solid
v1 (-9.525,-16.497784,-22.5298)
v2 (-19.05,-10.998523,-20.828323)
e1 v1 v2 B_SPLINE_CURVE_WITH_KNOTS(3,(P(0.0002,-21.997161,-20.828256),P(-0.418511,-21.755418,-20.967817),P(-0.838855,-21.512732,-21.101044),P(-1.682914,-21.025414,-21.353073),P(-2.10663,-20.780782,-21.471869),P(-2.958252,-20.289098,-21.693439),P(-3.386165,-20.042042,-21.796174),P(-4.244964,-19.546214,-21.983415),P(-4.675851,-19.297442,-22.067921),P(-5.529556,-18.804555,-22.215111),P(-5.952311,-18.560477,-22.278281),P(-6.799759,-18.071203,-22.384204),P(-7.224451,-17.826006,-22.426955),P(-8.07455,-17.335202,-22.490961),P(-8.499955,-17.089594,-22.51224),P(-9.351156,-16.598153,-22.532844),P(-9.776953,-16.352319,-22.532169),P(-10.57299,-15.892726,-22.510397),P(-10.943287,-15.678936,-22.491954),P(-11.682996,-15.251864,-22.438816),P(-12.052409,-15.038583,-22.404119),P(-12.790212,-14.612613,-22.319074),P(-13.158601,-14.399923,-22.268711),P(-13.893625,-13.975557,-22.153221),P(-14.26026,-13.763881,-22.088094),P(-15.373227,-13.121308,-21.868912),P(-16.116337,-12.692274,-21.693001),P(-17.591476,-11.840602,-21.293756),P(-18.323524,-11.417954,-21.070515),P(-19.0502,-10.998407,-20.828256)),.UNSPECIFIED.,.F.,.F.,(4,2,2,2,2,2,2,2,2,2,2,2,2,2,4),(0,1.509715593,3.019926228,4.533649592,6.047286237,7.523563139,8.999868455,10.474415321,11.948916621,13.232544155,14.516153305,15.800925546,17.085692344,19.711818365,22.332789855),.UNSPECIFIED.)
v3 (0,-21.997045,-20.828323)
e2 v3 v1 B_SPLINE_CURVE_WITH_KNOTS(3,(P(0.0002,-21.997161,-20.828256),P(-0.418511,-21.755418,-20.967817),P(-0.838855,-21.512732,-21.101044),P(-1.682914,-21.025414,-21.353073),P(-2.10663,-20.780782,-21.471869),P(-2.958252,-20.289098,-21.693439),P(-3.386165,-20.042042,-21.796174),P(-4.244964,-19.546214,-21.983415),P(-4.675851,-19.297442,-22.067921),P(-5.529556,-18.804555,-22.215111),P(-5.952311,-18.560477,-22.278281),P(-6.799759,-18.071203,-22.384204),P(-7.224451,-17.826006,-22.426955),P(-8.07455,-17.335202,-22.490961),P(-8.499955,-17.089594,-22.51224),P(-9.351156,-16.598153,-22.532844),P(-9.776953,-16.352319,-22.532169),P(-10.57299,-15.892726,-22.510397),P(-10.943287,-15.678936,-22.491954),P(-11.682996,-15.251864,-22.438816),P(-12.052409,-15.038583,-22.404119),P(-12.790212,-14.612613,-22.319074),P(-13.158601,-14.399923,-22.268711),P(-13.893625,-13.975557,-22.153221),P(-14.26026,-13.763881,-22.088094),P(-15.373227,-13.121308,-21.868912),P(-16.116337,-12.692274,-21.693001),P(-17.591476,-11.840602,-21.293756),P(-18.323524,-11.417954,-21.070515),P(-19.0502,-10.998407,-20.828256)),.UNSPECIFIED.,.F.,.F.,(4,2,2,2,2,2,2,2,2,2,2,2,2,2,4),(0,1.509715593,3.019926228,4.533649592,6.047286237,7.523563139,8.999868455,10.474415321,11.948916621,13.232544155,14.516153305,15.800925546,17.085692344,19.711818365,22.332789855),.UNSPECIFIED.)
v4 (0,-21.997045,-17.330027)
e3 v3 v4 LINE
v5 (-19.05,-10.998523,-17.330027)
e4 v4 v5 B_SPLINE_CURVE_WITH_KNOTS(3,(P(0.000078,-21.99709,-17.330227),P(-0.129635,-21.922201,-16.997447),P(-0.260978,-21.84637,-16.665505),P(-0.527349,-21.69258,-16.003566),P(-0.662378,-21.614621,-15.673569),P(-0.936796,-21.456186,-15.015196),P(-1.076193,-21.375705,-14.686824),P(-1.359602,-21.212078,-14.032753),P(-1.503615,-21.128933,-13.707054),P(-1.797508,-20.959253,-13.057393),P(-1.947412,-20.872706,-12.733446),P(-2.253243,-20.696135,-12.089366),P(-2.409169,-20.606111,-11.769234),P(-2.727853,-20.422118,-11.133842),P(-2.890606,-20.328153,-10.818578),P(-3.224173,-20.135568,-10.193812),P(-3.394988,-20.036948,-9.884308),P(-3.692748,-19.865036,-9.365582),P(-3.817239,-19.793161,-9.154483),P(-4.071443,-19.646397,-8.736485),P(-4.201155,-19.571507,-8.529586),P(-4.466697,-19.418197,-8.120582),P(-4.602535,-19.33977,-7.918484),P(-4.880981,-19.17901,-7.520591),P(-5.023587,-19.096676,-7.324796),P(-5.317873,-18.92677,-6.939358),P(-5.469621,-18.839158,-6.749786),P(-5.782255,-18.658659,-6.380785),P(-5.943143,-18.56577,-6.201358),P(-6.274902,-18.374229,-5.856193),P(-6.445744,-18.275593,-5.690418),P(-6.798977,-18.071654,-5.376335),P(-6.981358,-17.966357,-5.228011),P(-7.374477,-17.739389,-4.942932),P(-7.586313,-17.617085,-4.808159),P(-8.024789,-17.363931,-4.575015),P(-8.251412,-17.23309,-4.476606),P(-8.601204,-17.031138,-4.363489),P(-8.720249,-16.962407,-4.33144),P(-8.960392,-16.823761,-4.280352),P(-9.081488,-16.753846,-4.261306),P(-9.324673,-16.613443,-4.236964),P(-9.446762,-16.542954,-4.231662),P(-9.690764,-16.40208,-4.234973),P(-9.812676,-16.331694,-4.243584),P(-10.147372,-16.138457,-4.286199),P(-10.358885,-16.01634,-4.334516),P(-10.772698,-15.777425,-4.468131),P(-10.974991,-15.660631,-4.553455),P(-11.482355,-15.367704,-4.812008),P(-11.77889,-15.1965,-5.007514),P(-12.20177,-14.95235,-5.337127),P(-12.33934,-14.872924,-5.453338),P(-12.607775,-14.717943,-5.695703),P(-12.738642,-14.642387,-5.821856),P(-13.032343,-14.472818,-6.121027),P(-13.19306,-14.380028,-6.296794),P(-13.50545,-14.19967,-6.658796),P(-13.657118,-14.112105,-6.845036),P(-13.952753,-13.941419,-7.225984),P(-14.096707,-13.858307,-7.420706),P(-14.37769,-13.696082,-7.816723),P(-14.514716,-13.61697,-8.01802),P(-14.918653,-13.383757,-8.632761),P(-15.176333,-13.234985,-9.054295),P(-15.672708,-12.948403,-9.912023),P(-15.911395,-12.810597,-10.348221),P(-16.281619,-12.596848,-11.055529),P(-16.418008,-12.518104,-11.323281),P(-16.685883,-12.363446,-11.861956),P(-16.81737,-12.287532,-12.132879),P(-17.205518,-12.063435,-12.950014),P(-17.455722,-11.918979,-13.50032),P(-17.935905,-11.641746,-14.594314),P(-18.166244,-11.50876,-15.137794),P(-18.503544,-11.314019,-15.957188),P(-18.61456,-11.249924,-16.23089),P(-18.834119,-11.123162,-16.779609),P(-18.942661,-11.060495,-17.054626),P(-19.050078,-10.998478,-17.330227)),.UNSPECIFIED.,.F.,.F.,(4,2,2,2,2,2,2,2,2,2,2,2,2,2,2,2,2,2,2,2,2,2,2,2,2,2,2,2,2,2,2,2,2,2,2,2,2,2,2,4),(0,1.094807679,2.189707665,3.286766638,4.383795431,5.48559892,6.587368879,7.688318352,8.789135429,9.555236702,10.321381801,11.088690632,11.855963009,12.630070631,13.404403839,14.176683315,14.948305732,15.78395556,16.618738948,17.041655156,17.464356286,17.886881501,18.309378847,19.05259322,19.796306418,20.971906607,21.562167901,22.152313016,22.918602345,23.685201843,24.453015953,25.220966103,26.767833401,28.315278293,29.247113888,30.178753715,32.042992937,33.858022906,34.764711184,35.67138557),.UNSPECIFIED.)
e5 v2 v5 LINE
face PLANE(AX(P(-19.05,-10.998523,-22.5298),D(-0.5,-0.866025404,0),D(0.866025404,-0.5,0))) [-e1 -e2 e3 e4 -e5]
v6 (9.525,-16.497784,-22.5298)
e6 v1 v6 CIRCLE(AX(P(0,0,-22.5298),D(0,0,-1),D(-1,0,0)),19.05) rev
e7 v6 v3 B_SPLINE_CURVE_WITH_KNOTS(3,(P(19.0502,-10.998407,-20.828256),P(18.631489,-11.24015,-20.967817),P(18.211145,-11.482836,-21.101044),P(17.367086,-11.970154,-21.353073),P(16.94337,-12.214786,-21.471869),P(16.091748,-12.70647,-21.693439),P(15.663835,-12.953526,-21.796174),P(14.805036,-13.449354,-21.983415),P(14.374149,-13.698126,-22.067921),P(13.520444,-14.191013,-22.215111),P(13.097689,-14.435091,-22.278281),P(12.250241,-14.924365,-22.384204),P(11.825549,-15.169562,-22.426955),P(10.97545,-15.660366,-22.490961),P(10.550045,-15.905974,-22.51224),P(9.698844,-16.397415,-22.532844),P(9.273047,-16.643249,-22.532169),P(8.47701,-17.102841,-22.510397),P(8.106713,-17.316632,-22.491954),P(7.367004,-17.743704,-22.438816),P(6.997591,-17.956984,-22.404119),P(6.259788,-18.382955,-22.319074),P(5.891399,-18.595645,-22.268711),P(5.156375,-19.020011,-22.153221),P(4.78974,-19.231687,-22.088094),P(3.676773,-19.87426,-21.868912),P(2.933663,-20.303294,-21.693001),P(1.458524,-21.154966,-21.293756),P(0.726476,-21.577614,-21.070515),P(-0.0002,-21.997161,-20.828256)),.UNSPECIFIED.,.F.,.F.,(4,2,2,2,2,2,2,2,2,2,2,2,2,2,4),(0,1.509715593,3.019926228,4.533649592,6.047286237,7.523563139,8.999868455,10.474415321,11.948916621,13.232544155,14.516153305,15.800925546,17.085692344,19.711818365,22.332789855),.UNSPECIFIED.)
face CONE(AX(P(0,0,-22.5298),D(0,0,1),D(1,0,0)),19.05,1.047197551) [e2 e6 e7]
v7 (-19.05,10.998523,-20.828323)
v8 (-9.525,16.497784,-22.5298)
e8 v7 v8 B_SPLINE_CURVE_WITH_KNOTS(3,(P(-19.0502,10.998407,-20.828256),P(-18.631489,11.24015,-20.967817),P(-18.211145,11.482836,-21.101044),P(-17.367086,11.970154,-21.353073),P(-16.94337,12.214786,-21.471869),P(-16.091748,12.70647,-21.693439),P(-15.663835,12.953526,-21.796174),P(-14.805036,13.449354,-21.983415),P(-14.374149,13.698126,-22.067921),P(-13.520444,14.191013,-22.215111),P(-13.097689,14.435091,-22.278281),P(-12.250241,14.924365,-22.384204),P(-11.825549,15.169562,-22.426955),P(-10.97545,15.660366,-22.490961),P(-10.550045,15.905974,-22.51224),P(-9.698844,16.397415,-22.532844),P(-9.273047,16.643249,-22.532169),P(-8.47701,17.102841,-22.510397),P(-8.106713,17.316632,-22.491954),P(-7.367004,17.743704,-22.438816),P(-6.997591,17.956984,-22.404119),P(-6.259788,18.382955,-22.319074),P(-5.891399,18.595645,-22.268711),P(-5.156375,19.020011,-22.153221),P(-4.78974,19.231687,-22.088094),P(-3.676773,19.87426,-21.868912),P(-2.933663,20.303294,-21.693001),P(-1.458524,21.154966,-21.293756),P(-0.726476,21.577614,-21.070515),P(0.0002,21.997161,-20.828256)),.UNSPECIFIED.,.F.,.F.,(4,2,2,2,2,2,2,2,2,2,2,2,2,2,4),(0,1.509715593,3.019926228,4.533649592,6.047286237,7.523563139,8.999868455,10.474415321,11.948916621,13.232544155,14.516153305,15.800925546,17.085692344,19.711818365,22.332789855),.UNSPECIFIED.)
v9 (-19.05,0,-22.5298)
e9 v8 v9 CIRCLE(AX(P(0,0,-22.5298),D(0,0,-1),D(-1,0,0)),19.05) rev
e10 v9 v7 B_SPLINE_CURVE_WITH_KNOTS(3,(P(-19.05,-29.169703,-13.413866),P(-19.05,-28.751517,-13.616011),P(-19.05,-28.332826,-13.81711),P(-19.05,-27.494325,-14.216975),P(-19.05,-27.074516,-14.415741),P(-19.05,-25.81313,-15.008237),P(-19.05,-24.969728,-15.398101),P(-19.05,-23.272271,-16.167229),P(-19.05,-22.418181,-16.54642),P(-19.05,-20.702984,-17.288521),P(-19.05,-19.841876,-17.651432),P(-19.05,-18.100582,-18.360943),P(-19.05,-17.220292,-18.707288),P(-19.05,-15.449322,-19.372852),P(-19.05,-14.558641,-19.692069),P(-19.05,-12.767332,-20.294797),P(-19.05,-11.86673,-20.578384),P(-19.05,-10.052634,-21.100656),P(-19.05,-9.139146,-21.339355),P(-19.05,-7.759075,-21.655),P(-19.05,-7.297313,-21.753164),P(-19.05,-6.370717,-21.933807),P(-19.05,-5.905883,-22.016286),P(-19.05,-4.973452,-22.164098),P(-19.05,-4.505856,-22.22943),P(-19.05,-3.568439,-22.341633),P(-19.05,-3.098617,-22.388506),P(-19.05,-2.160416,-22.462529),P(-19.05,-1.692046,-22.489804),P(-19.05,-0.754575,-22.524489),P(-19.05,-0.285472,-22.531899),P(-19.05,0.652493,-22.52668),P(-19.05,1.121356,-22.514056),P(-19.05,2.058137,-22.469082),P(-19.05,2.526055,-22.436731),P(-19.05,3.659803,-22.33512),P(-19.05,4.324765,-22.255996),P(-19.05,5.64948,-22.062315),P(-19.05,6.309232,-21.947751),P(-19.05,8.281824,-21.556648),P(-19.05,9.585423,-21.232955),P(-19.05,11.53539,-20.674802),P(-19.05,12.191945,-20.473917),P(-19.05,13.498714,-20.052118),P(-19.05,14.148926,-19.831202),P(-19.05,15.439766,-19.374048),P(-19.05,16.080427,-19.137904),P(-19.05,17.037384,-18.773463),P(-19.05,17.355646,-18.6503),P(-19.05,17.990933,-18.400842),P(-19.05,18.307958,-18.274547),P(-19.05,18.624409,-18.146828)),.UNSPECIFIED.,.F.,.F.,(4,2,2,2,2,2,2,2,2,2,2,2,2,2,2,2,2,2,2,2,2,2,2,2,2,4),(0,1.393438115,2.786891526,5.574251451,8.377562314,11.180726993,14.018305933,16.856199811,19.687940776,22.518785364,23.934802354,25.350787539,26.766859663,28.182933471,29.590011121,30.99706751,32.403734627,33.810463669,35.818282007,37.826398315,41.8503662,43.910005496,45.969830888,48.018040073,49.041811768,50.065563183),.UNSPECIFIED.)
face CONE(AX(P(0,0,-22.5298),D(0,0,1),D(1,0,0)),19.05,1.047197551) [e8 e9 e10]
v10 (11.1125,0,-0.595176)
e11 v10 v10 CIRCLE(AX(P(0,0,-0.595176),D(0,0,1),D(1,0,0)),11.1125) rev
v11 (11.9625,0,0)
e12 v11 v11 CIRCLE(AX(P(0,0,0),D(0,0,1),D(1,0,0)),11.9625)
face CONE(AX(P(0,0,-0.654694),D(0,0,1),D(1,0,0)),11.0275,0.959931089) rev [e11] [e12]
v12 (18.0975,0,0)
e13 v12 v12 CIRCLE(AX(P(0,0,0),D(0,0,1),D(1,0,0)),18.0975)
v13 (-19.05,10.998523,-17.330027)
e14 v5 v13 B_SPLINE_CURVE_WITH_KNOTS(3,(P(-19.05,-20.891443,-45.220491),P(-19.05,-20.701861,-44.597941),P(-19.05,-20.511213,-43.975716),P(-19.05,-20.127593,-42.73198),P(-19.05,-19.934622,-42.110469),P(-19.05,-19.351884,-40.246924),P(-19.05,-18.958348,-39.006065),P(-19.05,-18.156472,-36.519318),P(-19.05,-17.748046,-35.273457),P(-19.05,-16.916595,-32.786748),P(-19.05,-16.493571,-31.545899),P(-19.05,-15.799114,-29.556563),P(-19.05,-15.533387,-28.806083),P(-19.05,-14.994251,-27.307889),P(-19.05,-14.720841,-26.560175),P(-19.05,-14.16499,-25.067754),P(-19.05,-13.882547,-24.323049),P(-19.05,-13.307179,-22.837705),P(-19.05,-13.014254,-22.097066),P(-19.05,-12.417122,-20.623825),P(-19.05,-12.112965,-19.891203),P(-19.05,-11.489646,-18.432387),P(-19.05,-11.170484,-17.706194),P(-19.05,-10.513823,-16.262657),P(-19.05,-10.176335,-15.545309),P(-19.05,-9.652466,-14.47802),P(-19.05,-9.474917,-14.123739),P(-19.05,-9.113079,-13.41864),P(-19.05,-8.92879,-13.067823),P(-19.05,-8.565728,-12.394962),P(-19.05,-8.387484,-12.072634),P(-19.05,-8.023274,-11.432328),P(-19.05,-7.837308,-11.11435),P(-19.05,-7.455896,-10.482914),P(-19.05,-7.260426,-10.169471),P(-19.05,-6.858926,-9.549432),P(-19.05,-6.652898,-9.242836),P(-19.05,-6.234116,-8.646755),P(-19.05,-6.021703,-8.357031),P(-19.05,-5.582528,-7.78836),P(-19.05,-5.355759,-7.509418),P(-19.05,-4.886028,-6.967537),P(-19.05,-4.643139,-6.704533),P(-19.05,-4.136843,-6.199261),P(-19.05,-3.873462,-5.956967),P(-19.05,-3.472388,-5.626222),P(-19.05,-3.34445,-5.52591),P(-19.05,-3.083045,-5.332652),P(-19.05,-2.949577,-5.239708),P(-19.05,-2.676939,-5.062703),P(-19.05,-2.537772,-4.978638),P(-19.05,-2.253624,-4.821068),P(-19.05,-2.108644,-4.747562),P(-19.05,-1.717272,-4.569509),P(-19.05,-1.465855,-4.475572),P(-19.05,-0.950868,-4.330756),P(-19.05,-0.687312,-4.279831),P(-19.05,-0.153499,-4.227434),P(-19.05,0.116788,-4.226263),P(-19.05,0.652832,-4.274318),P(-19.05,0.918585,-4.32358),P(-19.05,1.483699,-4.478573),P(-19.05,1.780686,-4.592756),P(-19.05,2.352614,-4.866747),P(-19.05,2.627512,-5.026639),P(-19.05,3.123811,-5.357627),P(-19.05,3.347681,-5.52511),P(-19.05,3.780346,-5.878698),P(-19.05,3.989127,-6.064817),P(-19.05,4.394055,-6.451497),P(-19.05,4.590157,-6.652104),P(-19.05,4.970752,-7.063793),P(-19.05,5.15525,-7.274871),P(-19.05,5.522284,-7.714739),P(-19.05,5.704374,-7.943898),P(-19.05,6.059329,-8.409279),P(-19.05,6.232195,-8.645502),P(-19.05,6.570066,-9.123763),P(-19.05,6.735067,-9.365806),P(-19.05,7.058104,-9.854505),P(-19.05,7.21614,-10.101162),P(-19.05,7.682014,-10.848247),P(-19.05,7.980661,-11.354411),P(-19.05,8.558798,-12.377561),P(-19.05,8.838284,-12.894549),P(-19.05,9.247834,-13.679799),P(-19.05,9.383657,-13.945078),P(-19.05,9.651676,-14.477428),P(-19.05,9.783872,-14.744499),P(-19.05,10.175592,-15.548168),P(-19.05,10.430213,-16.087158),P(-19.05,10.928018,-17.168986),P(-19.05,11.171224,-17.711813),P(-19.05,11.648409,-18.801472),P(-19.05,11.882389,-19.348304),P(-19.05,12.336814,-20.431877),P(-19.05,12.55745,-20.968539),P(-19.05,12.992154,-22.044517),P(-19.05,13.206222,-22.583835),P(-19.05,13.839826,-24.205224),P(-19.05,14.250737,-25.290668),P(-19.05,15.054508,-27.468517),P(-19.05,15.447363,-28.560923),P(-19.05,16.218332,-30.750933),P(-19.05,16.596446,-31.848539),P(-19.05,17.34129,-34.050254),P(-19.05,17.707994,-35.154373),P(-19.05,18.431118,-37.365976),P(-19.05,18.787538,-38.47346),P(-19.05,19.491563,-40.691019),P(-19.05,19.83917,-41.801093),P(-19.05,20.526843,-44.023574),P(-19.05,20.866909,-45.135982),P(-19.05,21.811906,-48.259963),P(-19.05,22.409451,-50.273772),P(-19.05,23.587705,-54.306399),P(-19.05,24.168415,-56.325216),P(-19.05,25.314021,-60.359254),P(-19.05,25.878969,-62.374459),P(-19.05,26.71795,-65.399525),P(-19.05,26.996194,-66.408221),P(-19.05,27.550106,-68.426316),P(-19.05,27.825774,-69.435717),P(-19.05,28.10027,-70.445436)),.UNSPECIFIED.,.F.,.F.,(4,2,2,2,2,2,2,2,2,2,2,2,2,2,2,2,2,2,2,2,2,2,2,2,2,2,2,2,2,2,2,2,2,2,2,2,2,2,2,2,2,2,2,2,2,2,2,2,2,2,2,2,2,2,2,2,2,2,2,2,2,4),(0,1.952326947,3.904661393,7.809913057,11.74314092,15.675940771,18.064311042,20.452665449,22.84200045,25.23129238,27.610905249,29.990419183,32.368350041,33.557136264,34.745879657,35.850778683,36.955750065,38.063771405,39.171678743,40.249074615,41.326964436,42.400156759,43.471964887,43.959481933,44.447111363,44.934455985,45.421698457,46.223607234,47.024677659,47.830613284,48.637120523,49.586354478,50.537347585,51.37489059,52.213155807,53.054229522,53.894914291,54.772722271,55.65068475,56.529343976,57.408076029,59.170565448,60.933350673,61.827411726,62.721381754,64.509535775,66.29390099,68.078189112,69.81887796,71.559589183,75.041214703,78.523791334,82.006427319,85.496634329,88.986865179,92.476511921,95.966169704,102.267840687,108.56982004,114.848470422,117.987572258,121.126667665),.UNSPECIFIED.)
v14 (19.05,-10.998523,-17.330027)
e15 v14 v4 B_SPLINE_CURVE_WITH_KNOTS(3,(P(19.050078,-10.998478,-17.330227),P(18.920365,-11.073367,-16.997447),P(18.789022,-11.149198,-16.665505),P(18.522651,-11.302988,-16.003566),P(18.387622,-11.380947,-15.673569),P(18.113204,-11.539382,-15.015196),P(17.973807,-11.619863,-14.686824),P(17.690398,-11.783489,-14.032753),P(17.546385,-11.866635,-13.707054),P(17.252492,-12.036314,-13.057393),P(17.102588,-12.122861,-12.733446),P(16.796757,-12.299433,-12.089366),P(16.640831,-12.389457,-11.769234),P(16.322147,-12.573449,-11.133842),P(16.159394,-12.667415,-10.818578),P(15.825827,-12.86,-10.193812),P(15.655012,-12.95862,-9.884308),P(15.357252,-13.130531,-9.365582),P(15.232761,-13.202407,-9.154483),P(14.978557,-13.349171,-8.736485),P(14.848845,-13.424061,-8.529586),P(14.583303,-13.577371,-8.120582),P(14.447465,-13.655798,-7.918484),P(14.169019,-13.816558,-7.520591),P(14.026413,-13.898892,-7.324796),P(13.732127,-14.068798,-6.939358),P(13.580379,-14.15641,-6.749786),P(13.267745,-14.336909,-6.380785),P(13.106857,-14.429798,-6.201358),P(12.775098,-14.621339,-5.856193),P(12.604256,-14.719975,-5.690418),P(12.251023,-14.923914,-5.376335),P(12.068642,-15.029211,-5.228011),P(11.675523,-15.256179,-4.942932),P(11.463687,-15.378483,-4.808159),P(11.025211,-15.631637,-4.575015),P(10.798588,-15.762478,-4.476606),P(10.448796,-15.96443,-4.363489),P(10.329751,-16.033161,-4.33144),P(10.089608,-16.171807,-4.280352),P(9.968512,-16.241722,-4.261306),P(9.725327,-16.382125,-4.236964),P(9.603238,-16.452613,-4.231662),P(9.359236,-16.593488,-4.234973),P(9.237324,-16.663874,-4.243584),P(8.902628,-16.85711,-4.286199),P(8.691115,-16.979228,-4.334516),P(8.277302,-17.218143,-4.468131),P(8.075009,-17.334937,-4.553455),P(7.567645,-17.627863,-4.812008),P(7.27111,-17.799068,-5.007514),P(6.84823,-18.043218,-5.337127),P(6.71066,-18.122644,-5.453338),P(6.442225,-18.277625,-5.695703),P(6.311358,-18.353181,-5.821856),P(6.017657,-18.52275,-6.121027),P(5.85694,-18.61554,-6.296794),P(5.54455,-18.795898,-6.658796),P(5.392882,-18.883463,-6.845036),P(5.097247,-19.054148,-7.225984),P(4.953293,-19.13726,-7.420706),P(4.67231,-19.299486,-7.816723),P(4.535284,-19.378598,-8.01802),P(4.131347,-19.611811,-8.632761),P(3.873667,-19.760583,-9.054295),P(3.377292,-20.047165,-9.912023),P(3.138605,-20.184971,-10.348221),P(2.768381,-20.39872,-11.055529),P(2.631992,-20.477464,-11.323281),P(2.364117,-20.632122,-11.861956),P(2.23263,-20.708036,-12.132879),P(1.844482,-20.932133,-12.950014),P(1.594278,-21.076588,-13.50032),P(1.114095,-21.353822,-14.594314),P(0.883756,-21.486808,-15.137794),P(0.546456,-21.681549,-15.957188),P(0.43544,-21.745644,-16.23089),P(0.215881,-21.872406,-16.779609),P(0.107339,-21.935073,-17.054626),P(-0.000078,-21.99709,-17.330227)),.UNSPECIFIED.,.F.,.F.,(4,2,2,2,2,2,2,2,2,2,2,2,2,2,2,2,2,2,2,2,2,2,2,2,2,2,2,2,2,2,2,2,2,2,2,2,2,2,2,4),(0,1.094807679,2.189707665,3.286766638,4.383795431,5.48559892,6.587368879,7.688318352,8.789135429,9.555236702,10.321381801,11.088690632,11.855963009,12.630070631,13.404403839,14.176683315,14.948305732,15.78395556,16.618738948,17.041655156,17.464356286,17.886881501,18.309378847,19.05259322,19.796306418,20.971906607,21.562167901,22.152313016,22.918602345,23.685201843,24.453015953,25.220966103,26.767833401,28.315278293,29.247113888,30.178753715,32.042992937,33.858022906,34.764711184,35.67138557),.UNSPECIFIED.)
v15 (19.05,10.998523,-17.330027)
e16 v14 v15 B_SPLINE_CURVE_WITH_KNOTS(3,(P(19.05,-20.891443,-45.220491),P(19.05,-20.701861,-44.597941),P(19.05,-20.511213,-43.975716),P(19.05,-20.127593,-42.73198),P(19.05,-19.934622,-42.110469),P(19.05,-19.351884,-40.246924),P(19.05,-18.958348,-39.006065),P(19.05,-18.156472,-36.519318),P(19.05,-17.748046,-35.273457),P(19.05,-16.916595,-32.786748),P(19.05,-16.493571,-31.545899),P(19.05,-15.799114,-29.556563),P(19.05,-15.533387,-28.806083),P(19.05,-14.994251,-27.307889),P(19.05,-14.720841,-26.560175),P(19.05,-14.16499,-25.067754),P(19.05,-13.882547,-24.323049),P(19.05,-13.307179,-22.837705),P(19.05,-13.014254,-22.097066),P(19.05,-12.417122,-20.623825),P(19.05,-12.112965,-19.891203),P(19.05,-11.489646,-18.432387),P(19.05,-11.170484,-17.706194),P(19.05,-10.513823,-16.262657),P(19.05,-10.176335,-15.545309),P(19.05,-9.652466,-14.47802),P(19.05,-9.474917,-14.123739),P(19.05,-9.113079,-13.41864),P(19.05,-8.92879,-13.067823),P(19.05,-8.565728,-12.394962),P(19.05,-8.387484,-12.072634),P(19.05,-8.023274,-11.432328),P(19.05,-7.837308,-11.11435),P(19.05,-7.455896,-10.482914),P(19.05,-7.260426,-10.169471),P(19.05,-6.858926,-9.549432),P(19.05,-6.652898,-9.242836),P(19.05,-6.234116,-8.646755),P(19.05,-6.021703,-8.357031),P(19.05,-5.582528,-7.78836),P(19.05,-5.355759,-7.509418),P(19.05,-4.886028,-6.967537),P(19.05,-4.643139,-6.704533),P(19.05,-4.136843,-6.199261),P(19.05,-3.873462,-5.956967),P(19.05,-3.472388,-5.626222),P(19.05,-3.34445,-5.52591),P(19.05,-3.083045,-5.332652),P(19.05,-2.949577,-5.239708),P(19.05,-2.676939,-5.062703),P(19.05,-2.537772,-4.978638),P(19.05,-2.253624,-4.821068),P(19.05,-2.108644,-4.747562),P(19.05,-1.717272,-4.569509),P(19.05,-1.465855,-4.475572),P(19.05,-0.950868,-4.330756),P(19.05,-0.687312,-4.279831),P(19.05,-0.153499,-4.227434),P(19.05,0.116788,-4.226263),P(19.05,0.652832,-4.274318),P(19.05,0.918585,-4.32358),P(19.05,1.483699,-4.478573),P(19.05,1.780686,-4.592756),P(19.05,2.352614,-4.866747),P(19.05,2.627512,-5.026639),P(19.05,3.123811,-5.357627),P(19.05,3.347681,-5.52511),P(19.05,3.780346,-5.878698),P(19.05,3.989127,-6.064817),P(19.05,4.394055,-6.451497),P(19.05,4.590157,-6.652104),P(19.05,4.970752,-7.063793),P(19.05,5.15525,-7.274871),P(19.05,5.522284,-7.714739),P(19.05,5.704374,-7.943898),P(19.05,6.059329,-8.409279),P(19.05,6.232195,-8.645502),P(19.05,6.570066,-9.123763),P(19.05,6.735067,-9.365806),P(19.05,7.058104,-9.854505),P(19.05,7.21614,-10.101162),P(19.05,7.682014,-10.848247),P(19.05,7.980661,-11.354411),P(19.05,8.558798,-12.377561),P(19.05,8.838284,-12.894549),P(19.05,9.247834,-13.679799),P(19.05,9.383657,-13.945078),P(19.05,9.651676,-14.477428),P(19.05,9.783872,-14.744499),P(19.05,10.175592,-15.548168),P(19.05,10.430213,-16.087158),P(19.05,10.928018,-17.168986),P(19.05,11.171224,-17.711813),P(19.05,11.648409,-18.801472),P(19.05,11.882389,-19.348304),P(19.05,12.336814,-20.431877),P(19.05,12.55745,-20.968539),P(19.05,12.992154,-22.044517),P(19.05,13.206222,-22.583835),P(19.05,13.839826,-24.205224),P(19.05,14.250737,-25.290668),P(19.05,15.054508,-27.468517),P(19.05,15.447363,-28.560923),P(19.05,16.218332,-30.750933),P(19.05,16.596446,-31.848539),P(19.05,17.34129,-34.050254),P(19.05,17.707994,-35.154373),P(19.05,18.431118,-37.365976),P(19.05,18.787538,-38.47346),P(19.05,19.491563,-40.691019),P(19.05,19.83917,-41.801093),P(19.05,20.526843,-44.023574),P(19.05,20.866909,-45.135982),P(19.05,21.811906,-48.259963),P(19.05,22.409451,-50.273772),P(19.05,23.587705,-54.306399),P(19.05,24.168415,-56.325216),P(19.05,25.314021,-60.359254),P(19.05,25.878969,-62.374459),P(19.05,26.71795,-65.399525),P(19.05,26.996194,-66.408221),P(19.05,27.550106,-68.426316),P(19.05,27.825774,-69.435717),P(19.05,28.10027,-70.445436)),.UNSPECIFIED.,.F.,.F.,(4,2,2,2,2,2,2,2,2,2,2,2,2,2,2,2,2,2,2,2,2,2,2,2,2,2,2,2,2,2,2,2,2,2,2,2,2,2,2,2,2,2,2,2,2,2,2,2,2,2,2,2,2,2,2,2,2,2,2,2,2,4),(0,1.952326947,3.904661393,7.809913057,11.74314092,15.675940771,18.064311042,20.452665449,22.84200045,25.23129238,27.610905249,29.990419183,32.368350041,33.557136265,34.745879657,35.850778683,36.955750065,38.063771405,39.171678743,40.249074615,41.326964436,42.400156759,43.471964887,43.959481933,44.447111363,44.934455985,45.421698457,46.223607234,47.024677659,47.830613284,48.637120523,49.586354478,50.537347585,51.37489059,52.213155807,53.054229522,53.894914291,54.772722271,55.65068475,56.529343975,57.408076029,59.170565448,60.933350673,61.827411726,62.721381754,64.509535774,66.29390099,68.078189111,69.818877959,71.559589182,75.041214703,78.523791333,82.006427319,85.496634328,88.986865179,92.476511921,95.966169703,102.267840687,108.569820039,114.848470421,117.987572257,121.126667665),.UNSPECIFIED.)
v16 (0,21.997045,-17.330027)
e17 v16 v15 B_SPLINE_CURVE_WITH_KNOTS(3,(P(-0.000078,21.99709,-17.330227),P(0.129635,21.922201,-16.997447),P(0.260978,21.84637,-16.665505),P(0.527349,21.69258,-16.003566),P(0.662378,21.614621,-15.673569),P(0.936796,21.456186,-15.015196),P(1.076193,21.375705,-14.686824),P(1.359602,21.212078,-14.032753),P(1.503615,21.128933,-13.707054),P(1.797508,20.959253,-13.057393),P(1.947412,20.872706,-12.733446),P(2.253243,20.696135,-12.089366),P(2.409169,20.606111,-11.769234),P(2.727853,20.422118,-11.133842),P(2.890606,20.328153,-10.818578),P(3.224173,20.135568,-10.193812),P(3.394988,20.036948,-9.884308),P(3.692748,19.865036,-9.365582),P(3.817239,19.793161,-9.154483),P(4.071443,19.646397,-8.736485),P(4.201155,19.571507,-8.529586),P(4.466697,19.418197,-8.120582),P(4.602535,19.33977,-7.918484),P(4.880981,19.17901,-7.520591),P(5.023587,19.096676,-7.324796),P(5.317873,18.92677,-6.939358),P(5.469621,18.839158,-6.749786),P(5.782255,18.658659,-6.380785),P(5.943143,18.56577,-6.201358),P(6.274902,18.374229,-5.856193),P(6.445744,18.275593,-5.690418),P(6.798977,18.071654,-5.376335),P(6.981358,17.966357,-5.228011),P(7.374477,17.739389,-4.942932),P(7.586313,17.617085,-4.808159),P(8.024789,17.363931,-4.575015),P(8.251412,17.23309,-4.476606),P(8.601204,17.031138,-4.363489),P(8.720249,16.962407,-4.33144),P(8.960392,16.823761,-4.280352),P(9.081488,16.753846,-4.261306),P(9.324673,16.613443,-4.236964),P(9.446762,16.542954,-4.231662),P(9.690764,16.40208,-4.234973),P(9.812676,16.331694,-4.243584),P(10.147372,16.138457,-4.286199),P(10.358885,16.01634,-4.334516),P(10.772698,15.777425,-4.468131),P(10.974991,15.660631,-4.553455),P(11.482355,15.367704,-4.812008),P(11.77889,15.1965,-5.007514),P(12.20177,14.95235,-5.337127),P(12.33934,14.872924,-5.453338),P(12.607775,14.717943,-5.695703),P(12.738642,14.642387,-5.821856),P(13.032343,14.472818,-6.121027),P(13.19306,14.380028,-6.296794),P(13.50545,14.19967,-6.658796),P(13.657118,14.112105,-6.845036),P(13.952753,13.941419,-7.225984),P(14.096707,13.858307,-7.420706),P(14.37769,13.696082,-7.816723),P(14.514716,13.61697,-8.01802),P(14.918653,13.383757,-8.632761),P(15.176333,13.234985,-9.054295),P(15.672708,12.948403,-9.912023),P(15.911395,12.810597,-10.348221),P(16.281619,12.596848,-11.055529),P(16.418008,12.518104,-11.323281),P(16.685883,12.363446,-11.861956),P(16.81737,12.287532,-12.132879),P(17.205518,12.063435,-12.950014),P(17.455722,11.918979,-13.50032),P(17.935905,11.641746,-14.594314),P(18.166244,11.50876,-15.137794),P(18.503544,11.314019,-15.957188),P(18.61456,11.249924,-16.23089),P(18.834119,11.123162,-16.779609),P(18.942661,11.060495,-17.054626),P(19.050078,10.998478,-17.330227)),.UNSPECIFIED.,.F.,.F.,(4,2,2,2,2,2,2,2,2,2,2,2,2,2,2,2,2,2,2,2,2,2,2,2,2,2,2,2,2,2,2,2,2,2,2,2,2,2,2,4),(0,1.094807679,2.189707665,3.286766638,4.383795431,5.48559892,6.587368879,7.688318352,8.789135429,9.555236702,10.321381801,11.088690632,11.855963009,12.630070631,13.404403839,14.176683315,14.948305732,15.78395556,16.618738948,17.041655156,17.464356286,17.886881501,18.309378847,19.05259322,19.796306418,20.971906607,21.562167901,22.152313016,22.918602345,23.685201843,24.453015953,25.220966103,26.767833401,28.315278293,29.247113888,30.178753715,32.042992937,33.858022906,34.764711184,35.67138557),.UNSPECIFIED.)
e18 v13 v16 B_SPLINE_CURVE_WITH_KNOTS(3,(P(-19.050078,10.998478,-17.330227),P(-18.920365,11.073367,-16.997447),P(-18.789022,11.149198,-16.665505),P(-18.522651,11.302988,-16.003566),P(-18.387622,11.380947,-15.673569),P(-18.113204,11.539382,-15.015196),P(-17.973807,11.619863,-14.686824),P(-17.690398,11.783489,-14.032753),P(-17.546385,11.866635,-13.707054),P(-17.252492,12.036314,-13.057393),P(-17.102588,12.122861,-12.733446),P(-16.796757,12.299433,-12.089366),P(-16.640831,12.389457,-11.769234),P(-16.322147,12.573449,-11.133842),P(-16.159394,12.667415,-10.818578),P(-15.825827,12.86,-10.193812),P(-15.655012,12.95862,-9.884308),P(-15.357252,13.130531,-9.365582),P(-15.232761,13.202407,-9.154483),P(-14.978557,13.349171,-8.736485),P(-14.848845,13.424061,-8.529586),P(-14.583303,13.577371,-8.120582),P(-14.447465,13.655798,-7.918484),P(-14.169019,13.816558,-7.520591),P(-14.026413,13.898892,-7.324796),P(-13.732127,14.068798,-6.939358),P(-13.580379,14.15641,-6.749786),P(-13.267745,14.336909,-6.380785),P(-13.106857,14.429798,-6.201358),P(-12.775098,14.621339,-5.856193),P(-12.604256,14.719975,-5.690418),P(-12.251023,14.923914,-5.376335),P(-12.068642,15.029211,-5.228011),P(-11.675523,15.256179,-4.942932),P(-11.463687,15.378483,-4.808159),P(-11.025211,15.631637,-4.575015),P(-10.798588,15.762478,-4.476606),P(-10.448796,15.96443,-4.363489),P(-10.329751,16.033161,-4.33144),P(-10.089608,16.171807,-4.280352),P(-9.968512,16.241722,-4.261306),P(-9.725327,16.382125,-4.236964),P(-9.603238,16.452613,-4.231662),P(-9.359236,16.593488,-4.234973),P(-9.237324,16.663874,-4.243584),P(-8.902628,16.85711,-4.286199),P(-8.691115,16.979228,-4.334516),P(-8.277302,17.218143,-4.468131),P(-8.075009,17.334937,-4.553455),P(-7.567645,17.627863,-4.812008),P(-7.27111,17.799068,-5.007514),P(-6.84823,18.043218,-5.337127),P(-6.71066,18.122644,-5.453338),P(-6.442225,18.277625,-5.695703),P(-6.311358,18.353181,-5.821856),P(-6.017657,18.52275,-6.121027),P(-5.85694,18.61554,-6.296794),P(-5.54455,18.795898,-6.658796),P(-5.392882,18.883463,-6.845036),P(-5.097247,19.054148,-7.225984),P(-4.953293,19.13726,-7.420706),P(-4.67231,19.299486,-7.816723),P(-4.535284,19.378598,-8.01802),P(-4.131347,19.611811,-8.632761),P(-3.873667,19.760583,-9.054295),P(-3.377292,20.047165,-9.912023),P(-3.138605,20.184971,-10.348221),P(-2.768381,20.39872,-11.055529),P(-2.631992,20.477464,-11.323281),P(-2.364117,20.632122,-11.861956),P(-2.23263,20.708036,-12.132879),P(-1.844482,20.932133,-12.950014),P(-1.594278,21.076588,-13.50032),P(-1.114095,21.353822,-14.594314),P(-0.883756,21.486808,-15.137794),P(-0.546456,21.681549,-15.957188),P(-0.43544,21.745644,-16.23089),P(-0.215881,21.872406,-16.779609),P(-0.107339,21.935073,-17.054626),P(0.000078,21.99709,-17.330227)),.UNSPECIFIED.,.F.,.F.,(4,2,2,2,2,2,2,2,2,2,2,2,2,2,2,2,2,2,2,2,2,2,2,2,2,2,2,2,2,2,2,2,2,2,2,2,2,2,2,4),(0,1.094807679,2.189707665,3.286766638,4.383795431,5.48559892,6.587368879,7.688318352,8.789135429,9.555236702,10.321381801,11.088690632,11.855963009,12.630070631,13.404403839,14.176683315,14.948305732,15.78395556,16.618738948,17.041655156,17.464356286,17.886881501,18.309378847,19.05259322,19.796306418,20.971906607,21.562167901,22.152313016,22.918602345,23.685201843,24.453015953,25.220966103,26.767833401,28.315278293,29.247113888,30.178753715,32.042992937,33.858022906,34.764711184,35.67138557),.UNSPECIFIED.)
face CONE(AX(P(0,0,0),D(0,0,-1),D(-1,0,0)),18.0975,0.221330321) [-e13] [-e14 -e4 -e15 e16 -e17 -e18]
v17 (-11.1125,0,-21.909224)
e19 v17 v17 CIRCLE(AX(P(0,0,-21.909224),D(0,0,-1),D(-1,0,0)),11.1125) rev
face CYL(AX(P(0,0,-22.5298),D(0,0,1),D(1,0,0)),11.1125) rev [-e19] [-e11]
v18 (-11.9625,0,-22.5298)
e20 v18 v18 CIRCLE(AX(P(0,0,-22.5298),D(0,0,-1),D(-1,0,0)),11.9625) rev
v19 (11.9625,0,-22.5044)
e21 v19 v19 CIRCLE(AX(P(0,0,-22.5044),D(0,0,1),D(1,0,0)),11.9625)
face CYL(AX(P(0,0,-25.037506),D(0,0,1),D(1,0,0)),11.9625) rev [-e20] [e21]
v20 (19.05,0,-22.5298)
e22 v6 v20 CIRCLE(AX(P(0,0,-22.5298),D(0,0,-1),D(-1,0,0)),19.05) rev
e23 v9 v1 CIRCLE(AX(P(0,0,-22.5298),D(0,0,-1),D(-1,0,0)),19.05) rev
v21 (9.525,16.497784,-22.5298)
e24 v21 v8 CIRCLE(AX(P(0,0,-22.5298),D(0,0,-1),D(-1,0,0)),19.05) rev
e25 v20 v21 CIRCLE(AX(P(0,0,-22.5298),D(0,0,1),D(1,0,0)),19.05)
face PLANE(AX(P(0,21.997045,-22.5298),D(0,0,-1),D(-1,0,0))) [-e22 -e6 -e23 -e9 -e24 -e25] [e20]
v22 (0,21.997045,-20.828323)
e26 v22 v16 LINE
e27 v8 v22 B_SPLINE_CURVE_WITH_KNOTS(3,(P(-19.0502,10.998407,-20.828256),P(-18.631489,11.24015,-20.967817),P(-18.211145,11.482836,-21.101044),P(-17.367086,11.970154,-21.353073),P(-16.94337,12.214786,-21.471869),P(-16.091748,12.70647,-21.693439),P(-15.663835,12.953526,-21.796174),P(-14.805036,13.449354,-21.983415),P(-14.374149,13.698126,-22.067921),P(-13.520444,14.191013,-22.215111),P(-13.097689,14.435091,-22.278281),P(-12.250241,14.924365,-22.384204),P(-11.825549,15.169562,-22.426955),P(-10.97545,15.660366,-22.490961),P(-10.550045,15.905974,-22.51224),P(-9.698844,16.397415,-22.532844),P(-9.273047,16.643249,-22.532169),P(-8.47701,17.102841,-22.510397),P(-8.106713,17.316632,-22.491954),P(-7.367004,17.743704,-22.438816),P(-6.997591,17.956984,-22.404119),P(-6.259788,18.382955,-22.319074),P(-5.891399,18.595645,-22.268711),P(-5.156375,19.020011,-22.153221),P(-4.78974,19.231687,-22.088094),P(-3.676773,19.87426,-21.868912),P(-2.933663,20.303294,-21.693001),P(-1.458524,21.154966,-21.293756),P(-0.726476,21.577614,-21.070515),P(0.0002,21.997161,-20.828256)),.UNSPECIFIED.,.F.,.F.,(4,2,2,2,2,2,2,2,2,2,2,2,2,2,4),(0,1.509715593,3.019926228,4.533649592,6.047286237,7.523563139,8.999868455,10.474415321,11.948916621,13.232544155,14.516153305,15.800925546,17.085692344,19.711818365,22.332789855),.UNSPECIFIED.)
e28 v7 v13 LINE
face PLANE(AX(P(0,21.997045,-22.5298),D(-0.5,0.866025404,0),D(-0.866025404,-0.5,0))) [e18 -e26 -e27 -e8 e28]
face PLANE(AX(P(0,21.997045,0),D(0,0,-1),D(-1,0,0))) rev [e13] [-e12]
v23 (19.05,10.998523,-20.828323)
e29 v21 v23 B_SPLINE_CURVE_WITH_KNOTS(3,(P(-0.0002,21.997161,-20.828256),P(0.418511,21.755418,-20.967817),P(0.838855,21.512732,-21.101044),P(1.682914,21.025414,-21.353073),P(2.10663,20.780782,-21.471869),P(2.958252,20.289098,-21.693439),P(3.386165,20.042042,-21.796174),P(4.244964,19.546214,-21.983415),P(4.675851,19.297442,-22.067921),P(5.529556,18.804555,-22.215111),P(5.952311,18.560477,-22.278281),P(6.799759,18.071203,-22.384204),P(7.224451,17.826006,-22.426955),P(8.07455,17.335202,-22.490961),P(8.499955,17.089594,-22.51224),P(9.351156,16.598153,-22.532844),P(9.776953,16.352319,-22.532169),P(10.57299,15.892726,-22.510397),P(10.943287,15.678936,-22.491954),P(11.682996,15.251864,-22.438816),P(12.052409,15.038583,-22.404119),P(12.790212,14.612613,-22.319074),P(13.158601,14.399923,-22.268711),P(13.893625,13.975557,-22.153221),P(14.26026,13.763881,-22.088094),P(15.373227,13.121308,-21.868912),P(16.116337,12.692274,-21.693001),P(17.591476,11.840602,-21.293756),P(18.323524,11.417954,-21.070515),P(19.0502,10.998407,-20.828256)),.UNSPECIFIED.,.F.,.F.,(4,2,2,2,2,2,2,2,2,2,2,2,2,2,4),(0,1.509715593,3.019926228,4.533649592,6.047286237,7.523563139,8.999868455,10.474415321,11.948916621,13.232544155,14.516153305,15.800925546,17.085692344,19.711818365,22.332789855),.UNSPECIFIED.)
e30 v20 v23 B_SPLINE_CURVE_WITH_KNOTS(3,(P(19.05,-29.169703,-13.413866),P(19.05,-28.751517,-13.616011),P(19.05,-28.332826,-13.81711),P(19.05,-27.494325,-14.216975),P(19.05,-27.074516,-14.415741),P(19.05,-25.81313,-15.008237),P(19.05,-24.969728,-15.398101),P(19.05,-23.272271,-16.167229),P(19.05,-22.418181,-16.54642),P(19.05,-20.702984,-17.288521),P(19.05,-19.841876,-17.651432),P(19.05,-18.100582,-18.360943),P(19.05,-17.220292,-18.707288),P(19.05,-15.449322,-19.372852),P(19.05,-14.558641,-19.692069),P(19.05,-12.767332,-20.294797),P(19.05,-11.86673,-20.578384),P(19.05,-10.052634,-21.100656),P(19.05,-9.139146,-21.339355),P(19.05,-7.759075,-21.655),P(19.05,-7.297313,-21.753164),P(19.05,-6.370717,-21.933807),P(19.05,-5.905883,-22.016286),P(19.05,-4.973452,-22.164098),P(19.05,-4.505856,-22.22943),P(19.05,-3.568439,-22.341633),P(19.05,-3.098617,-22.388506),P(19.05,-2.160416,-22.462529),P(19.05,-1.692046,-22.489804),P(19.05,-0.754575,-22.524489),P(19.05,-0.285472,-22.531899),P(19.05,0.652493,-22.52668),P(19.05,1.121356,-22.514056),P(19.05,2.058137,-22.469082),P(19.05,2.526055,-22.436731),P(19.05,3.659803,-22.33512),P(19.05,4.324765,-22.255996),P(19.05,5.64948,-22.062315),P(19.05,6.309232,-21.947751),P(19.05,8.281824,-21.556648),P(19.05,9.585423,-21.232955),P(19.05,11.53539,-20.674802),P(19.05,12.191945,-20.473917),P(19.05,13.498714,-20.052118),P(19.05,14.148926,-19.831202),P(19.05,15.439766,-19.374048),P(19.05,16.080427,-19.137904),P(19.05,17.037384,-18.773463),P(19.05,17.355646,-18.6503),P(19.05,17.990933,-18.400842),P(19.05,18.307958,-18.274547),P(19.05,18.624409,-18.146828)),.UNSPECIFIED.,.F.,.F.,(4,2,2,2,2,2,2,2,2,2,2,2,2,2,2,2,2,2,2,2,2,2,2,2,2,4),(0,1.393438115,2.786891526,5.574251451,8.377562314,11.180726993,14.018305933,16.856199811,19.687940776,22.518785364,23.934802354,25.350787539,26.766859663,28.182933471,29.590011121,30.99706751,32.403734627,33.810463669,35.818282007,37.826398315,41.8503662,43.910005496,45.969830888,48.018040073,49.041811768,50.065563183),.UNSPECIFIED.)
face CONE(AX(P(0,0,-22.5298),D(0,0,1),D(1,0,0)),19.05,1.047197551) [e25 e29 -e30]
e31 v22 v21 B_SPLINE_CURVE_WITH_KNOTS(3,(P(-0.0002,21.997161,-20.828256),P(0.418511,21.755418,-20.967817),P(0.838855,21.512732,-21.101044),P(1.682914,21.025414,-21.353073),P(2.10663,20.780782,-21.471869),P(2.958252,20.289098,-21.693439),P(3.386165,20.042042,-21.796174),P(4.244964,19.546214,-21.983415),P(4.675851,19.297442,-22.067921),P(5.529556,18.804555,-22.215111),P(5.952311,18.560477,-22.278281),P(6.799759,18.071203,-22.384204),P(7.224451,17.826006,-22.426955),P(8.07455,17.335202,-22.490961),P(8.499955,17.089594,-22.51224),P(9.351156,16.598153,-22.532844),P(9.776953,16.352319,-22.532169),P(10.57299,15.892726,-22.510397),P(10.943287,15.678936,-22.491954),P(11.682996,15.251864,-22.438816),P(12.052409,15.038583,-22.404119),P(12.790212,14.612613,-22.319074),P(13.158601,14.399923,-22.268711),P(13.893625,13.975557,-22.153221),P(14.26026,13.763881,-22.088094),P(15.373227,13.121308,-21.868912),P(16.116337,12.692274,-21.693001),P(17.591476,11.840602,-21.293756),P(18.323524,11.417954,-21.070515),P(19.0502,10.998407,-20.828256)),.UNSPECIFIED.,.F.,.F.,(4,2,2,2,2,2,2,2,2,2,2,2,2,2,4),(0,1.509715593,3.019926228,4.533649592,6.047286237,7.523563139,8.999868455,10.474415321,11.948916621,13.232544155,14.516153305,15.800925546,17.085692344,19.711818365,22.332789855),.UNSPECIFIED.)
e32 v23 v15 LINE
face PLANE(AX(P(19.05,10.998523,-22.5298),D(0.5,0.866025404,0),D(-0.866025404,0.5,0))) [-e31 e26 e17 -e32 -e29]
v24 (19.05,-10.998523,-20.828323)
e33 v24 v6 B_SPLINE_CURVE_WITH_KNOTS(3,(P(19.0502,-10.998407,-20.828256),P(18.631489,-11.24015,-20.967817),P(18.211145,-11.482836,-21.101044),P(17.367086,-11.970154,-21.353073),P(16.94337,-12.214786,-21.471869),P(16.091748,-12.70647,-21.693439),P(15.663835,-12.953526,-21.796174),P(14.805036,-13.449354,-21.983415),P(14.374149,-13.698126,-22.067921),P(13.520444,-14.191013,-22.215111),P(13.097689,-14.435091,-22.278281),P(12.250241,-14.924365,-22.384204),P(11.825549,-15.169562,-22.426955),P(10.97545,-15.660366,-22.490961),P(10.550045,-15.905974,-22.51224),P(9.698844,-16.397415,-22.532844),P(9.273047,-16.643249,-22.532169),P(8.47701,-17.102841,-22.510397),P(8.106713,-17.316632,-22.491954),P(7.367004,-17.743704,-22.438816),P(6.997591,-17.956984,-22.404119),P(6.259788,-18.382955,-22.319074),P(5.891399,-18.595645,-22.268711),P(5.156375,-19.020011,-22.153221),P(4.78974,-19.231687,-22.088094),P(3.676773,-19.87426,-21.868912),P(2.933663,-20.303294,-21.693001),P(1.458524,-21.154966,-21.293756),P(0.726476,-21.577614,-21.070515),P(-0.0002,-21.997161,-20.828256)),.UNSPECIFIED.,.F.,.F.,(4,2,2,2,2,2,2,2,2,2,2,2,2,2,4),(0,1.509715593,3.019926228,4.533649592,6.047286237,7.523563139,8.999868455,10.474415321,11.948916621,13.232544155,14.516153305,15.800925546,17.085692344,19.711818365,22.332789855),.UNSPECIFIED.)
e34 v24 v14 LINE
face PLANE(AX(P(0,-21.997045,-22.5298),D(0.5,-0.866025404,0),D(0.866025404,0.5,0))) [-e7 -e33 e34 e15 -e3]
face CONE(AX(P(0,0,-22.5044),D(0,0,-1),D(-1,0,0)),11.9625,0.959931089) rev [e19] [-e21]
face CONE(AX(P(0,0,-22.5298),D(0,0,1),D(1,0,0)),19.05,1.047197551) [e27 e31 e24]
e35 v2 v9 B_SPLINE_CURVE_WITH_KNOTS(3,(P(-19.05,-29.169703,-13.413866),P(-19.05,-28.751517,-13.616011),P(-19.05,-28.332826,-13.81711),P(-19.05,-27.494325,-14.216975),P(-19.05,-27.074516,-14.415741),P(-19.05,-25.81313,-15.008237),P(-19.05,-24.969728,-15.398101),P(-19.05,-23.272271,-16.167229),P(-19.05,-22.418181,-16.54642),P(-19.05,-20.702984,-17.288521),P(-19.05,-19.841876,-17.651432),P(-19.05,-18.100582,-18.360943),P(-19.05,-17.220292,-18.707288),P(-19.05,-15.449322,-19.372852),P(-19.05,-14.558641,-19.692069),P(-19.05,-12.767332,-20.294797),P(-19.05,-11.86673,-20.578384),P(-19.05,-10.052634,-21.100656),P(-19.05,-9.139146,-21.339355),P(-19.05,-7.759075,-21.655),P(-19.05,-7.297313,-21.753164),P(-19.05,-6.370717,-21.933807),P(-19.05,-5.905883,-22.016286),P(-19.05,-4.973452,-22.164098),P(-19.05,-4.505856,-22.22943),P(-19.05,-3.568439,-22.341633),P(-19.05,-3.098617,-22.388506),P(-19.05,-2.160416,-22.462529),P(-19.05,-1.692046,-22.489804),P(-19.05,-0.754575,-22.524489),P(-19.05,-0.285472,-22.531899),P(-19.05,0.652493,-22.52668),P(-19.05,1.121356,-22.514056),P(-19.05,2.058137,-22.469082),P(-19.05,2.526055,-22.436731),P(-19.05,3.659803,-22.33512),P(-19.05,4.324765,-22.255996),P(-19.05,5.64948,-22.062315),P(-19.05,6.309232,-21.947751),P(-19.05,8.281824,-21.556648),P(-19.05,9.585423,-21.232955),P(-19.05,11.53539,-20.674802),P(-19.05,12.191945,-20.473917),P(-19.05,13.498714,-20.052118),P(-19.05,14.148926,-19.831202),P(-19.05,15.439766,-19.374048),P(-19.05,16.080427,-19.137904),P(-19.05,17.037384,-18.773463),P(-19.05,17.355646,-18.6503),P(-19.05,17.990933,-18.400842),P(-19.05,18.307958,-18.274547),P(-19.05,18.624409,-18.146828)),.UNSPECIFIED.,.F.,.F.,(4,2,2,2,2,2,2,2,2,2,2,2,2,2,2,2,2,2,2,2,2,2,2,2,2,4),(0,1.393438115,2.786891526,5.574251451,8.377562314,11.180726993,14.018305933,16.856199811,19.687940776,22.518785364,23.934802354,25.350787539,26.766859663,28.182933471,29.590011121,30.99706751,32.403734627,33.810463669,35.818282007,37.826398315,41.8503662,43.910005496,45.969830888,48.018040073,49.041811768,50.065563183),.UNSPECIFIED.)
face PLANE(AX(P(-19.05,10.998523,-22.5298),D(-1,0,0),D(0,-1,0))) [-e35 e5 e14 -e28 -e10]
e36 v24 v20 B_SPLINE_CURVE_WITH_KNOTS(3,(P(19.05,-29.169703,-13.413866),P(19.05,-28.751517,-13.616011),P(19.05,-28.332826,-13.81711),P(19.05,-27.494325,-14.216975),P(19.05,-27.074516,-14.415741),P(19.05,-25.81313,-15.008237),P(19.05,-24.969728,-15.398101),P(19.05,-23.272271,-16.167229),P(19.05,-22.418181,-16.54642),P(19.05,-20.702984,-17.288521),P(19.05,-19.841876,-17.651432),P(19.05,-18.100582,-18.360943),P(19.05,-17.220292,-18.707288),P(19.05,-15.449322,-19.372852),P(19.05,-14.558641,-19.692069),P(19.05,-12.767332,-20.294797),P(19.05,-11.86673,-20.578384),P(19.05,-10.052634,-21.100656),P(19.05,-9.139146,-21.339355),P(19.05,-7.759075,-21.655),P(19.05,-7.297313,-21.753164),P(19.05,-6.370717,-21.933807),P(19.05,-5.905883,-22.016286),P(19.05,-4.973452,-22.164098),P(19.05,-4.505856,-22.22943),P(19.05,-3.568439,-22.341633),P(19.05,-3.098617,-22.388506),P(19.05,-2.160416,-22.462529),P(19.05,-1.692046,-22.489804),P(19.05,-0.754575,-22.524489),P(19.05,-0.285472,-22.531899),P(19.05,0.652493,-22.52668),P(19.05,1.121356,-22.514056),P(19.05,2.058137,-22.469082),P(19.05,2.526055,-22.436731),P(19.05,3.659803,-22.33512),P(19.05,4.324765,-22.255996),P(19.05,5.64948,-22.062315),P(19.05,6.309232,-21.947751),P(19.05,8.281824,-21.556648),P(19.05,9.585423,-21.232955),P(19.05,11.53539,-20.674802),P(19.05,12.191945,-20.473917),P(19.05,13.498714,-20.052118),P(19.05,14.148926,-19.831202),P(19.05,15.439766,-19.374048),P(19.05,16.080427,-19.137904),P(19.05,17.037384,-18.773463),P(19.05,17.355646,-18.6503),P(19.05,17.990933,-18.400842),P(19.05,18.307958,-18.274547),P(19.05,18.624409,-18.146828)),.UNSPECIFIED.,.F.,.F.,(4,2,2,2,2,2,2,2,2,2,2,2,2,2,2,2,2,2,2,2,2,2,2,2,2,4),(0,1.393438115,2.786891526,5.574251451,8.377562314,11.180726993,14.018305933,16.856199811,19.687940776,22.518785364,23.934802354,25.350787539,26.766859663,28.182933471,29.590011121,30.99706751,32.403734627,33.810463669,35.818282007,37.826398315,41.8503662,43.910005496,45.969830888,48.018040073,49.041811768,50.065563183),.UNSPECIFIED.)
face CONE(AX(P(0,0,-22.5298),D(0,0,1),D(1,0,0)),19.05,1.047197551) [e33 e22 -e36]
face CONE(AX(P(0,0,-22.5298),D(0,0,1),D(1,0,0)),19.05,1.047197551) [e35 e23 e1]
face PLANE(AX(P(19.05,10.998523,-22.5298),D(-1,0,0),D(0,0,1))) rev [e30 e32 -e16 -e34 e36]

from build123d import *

# Parameters (mm, degrees)
BASENUT_START = -22.5298
BASENUTSKE_R  = 11.1125
BASENUT_DEPTH = 22.5298


# Read off the part's stored shape, not the designer's step: ThreadSchematic
with BuildPart() as part:
    # BaseNutSke → BaseNut (new body)
    with BuildSketch(Plane.XY.offset(BASENUT_START)):
        Polygon((19.05, 10.998522628), (19.05, -10.998522628), (0, -21.997045256), (-19.05, -10.998522628), (-19.05, 10.998522628), (0, 21.997045256), align=None)
        Circle(BASENUTSKE_R, mode=Mode.SUBTRACT)
    extrude(amount=BASENUT_DEPTH)

    # Sketch5 (on Top Plane) → EndChamfer (revolve, cut)
    with BuildSketch(Plane(origin=(0, 0, 0), x_dir=(1, 0, 0), z_dir=(0, 1, 0))):
        Polygon((22.5044, 11.9625), (21.849705952, 11.0275), (22.5552, 11.0275), (22.5552, 11.9625), align=None)
        Polygon((-0.0508, 11.9625), (0, 11.9625), (0.654694048, 11.0275), (-0.0508, 11.0275), align=None)
    revolve(axis=Axis((0, 0, -11.9625), (0.5735764363510524, 0, 0.8191520442889872)), mode=Mode.SUBTRACT)

    # Sketch3 → Double-Chamfer (revolve, cut)
    with BuildSketch(Plane(origin=(0, 0, 0), x_dir=(0, 0, -1), z_dir=(1, 0, 0)), mode=Mode.PRIVATE) as double_chamfer_sk:
        Polygon((22.5298, 19.05), (20.828322628, 21.997045256), (20.828322628, 31.997045256), (32.5298, 31.997045256), (32.5298, 19.05), align=None)
        Polygon((17.330027328, 31.997045256), (-10, 31.997045256), (-10, 18.0975), (0, 18.0975), (17.330027328, 21.997045256), align=None)
    revolve(double_chamfer_sk.sketch.rotate(Axis((0, 0, 0), (0, 0, -1)), 240.000000311), axis=Axis((0, 0, 0), (0, 0, -1)), mode=Mode.SUBTRACT)

    # ThreadSchematic outline → ThreadSchematic (revolve, cut)
    with BuildSketch(Plane.XZ):
        Polygon((11.1125, 0), (11.1125, -0.595176407), (11.9625, 0), align=None)
        Polygon((11.9625, -22.5044), (11.1125, -21.909223593), (11.1125, -22.5298), (11.9625, -22.5298), align=None)
    revolve(axis=Axis((0, 0, 0), (0, 0, 1)), mode=Mode.SUBTRACT)


solid = part.part
